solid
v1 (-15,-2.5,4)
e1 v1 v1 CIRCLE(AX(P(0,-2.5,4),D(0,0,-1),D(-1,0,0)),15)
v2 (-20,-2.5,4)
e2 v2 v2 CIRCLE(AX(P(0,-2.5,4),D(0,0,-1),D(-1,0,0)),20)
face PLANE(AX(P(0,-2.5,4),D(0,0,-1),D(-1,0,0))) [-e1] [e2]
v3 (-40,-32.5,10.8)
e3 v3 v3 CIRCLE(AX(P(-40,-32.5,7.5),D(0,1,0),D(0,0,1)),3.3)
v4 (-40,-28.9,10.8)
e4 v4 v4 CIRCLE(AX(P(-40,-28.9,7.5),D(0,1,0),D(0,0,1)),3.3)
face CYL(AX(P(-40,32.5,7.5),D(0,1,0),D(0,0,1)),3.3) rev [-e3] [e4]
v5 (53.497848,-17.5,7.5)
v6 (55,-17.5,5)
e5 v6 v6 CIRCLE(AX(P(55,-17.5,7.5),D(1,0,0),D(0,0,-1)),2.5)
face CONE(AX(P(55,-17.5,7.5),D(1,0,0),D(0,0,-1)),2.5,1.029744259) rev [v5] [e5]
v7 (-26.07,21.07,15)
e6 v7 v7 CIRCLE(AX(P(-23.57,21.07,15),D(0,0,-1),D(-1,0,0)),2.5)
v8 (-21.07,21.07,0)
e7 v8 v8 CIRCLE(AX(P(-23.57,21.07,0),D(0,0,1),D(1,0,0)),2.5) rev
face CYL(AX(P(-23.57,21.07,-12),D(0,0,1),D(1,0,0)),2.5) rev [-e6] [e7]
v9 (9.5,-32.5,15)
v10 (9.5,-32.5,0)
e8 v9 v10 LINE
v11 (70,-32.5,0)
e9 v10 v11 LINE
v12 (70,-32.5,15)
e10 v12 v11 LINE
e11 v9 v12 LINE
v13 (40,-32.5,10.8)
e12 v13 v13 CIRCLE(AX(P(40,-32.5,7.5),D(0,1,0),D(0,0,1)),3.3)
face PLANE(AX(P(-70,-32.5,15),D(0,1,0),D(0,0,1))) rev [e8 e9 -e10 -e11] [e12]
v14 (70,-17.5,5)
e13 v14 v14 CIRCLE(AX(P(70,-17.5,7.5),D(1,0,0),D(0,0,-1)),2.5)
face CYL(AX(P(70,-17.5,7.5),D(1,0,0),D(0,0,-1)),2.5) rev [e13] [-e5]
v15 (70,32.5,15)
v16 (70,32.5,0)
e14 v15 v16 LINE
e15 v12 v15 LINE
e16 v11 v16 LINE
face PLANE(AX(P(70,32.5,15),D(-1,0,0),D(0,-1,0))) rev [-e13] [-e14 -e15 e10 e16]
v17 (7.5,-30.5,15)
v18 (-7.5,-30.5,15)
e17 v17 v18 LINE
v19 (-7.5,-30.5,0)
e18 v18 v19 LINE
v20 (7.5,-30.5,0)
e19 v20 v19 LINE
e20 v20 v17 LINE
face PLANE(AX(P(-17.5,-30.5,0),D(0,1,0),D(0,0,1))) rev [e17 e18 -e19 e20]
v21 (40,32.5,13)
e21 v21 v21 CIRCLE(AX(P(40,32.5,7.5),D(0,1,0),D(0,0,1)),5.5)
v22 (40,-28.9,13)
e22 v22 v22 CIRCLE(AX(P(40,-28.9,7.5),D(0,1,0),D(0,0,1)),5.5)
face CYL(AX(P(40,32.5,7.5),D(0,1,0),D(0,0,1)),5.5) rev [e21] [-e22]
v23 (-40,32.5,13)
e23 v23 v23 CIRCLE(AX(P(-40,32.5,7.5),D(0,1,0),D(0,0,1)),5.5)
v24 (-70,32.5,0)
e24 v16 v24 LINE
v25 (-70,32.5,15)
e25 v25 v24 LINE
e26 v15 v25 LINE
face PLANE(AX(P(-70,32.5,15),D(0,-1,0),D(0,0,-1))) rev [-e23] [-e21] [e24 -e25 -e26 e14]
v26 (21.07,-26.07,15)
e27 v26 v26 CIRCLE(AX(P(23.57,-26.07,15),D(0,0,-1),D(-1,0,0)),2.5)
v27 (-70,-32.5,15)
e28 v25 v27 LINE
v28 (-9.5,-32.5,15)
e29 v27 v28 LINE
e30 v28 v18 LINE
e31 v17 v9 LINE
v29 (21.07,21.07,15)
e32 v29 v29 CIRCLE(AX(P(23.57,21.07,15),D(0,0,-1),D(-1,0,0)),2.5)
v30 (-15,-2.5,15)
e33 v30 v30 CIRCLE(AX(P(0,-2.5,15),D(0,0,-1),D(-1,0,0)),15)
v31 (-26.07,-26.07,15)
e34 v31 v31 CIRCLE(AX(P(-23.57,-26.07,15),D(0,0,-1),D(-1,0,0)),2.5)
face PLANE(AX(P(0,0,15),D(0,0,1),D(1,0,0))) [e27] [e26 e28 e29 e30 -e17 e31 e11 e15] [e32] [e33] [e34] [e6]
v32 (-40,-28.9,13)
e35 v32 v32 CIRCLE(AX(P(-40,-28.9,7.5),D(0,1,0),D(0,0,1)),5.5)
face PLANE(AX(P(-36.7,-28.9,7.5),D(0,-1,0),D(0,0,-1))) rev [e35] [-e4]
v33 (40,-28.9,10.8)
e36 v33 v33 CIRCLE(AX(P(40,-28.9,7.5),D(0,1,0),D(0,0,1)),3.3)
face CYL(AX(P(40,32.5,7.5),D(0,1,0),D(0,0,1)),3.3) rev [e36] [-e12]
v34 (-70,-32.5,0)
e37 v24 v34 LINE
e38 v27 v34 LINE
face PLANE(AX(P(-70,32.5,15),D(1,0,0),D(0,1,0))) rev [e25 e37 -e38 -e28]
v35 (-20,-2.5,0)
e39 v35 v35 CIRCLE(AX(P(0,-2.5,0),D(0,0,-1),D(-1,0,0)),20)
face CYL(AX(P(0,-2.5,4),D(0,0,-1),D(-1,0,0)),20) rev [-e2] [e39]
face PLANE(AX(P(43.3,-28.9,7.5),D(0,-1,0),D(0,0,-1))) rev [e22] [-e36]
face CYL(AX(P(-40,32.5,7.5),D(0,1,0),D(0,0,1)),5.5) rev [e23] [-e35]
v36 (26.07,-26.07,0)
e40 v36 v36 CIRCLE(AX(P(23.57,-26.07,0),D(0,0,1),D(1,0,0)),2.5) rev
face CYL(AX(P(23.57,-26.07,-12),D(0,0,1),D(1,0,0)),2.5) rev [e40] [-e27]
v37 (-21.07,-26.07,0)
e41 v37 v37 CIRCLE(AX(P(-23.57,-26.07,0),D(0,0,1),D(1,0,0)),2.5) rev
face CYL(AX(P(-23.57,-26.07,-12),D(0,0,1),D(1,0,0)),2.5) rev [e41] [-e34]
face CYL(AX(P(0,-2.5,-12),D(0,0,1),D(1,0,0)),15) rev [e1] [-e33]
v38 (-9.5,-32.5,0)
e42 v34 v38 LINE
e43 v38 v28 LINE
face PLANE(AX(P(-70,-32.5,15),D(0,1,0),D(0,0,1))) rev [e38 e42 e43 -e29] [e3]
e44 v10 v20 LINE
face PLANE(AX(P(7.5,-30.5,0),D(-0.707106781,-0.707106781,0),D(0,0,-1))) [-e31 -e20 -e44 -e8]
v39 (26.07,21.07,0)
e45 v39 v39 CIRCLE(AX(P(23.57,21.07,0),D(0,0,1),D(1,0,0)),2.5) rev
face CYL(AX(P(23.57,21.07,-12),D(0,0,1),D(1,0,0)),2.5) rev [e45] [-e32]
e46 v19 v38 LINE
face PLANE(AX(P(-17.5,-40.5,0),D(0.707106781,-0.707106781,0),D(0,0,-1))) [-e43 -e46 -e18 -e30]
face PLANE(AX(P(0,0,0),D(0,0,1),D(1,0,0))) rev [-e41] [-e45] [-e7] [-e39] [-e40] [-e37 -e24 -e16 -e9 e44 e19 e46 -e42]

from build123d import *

# Parameters (mm, degrees)
SKETCH1_W                                           = 140
SKETCH1_H                                           = 65
BOSS_EXTRUDE1_DEPTH                                 = 15
SKETCH2_R                                           = 15
SKETCH2_R_2                                         = 2.5
CUT_EXTRUDE2_DEPTH                                  = 27
TAP_DRILL_FOR_M6_TAP1_D                             = 5
TAP_DRILL_FOR_M6_TAP1_DEPTH                         = 15
TAP_DRILL_FOR_M6_TAP1_TIP                           = 1.502151548
CBORE_FOR_M6_HEX_SOCKET_HEAD_CAP_SCREW3_D           = 6.6
CBORE_FOR_M6_HEX_SOCKET_HEAD_CAP_SCREW3_CBORE_D     = 11
CBORE_FOR_M6_HEX_SOCKET_HEAD_CAP_SCREW3_CBORE_DEPTH = 61.4
SKETCH29_W                                          = 35
SKETCH29_H                                          = 2
CUT_EXTRUDE6_DEPTH                                  = 79.620925968
CHAMFER2_SIZE                                       = 10
SKETCH30_R                                          = 20
CUT_EXTRUDE7_DEPTH                                  = 4


with BuildPart() as part:
    # Sketch1 → Boss-Extrude1 (new body)
    with BuildSketch(Plane.XY):
        Rectangle(SKETCH1_W, SKETCH1_H)
    extrude(amount=BOSS_EXTRUDE1_DEPTH)

    # Sketch2 → Cut-Extrude2 (cut)
    with BuildSketch(Plane(origin=(0, 0, 15), x_dir=(-1, 0, 0), z_dir=(0, 0, -1))):
        with Locations(Location((0, -2.5, 0), (0, 0, 180))):
            Circle(SKETCH2_R)
        with Locations(Location((-23.57, 21.07, 0), (0, 0, 180))):
            Circle(SKETCH2_R_2)
        with Locations(Location((23.57, 21.07, 0), (0, 0, 180))):
            Circle(SKETCH2_R_2)
        with Locations(Location((23.57, -26.07, 0), (0, 0, 180))):
            Circle(SKETCH2_R_2)
        with Locations(Location((-23.57, -26.07, 0), (0, 0, 180))):
            Circle(SKETCH2_R_2)
    extrude(amount=CUT_EXTRUDE2_DEPTH, mode=Mode.SUBTRACT)

    # Tap Drill for M6 Tap1
    with Locations(Plane(origin=(70, 0, 0), x_dir=(0, 0, -1), z_dir=(1, 0, 0))):
        with Locations((-7.5, -17.5)):
            Hole(TAP_DRILL_FOR_M6_TAP1_D / 2, depth=TAP_DRILL_FOR_M6_TAP1_DEPTH)
            with Locations((0, 0, -(TAP_DRILL_FOR_M6_TAP1_DEPTH + TAP_DRILL_FOR_M6_TAP1_TIP / 2))):  # 118° drill point
                Cone(0, TAP_DRILL_FOR_M6_TAP1_D / 2, TAP_DRILL_FOR_M6_TAP1_TIP, mode=Mode.SUBTRACT)

    # CBORE for M6 Hex Socket Head Cap Screw3 (through all)
    with Locations(Plane(origin=(0, 32.5, 0), x_dir=(1, 0, 0), z_dir=(0, 1, 0))):
        with Locations((40, -7.5), (-40, -7.5)):
            CounterBoreHole(CBORE_FOR_M6_HEX_SOCKET_HEAD_CAP_SCREW3_D / 2, CBORE_FOR_M6_HEX_SOCKET_HEAD_CAP_SCREW3_CBORE_D / 2, CBORE_FOR_M6_HEX_SOCKET_HEAD_CAP_SCREW3_CBORE_DEPTH)

    # Sketch29 → Cut-Extrude6 (cut, through all)
    with BuildSketch(Plane.XY.offset(15)):
        with Locations((0, -31.5)):
            Rectangle(SKETCH29_W, SKETCH29_H)
    extrude(amount=-CUT_EXTRUDE6_DEPTH, mode=Mode.SUBTRACT)

    # Chamfer2
    # the kernel refuses this chamfer: 10 mm, written as the material it adds along each edge
    with BuildSketch(Plane(origin=(-17.5, -30.5, 15), x_dir=(-0.027495876610591493, -0.9996219169112965, 0), z_dir=(0, 0, -1))) as chamfer2_piece_1_section:
        Polygon((CHAMFER2_SIZE * 0.999621916911, -CHAMFER2_SIZE * 0.0274958766106), (-CHAMFER2_SIZE * 0.0274958766106, -CHAMFER2_SIZE * 0.999621916911), (0, 0), align=None)
    chamfer2_piece_1 = extrude(amount=15, mode=Mode.PRIVATE)
    chamfer2_piece_1 = split(chamfer2_piece_1, bisect_by=Plane(origin=(-12.880949734, -32.5, 7.5), z_dir=(0, 1, 0)), keep=Keep.TOP, mode=Mode.PRIVATE)
    add(chamfer2_piece_1)
    with BuildSketch(Plane(origin=(17.5, -30.5, 15), x_dir=(-0.9996219169112968, 0.027495876610586317, 0), z_dir=(0, 0, -1))) as chamfer2_piece_2_section:
        Polygon((CHAMFER2_SIZE * 0.999621916911, -CHAMFER2_SIZE * 0.0274958766106), (-CHAMFER2_SIZE * 0.0274958766106, -CHAMFER2_SIZE * 0.999621916911), (0, 0), align=None)
    chamfer2_piece_2 = extrude(amount=15, mode=Mode.PRIVATE)
    chamfer2_piece_2 = split(chamfer2_piece_2, bisect_by=Plane(origin=(12.880949734, -32.5, 7.5), z_dir=(0, 1, 0)), keep=Keep.TOP, mode=Mode.PRIVATE)
    add(chamfer2_piece_2)

    # Sketch30 → Cut-Extrude7 (cut)
    with BuildSketch(Plane(origin=(0, 0, 0), x_dir=(-1, 0, 0), z_dir=(0, 0, -1))):
        with Locations((0, -2.5)):
            Circle(SKETCH30_R)
    extrude(amount=-CUT_EXTRUDE7_DEPTH, mode=Mode.SUBTRACT)


solid = part.part
